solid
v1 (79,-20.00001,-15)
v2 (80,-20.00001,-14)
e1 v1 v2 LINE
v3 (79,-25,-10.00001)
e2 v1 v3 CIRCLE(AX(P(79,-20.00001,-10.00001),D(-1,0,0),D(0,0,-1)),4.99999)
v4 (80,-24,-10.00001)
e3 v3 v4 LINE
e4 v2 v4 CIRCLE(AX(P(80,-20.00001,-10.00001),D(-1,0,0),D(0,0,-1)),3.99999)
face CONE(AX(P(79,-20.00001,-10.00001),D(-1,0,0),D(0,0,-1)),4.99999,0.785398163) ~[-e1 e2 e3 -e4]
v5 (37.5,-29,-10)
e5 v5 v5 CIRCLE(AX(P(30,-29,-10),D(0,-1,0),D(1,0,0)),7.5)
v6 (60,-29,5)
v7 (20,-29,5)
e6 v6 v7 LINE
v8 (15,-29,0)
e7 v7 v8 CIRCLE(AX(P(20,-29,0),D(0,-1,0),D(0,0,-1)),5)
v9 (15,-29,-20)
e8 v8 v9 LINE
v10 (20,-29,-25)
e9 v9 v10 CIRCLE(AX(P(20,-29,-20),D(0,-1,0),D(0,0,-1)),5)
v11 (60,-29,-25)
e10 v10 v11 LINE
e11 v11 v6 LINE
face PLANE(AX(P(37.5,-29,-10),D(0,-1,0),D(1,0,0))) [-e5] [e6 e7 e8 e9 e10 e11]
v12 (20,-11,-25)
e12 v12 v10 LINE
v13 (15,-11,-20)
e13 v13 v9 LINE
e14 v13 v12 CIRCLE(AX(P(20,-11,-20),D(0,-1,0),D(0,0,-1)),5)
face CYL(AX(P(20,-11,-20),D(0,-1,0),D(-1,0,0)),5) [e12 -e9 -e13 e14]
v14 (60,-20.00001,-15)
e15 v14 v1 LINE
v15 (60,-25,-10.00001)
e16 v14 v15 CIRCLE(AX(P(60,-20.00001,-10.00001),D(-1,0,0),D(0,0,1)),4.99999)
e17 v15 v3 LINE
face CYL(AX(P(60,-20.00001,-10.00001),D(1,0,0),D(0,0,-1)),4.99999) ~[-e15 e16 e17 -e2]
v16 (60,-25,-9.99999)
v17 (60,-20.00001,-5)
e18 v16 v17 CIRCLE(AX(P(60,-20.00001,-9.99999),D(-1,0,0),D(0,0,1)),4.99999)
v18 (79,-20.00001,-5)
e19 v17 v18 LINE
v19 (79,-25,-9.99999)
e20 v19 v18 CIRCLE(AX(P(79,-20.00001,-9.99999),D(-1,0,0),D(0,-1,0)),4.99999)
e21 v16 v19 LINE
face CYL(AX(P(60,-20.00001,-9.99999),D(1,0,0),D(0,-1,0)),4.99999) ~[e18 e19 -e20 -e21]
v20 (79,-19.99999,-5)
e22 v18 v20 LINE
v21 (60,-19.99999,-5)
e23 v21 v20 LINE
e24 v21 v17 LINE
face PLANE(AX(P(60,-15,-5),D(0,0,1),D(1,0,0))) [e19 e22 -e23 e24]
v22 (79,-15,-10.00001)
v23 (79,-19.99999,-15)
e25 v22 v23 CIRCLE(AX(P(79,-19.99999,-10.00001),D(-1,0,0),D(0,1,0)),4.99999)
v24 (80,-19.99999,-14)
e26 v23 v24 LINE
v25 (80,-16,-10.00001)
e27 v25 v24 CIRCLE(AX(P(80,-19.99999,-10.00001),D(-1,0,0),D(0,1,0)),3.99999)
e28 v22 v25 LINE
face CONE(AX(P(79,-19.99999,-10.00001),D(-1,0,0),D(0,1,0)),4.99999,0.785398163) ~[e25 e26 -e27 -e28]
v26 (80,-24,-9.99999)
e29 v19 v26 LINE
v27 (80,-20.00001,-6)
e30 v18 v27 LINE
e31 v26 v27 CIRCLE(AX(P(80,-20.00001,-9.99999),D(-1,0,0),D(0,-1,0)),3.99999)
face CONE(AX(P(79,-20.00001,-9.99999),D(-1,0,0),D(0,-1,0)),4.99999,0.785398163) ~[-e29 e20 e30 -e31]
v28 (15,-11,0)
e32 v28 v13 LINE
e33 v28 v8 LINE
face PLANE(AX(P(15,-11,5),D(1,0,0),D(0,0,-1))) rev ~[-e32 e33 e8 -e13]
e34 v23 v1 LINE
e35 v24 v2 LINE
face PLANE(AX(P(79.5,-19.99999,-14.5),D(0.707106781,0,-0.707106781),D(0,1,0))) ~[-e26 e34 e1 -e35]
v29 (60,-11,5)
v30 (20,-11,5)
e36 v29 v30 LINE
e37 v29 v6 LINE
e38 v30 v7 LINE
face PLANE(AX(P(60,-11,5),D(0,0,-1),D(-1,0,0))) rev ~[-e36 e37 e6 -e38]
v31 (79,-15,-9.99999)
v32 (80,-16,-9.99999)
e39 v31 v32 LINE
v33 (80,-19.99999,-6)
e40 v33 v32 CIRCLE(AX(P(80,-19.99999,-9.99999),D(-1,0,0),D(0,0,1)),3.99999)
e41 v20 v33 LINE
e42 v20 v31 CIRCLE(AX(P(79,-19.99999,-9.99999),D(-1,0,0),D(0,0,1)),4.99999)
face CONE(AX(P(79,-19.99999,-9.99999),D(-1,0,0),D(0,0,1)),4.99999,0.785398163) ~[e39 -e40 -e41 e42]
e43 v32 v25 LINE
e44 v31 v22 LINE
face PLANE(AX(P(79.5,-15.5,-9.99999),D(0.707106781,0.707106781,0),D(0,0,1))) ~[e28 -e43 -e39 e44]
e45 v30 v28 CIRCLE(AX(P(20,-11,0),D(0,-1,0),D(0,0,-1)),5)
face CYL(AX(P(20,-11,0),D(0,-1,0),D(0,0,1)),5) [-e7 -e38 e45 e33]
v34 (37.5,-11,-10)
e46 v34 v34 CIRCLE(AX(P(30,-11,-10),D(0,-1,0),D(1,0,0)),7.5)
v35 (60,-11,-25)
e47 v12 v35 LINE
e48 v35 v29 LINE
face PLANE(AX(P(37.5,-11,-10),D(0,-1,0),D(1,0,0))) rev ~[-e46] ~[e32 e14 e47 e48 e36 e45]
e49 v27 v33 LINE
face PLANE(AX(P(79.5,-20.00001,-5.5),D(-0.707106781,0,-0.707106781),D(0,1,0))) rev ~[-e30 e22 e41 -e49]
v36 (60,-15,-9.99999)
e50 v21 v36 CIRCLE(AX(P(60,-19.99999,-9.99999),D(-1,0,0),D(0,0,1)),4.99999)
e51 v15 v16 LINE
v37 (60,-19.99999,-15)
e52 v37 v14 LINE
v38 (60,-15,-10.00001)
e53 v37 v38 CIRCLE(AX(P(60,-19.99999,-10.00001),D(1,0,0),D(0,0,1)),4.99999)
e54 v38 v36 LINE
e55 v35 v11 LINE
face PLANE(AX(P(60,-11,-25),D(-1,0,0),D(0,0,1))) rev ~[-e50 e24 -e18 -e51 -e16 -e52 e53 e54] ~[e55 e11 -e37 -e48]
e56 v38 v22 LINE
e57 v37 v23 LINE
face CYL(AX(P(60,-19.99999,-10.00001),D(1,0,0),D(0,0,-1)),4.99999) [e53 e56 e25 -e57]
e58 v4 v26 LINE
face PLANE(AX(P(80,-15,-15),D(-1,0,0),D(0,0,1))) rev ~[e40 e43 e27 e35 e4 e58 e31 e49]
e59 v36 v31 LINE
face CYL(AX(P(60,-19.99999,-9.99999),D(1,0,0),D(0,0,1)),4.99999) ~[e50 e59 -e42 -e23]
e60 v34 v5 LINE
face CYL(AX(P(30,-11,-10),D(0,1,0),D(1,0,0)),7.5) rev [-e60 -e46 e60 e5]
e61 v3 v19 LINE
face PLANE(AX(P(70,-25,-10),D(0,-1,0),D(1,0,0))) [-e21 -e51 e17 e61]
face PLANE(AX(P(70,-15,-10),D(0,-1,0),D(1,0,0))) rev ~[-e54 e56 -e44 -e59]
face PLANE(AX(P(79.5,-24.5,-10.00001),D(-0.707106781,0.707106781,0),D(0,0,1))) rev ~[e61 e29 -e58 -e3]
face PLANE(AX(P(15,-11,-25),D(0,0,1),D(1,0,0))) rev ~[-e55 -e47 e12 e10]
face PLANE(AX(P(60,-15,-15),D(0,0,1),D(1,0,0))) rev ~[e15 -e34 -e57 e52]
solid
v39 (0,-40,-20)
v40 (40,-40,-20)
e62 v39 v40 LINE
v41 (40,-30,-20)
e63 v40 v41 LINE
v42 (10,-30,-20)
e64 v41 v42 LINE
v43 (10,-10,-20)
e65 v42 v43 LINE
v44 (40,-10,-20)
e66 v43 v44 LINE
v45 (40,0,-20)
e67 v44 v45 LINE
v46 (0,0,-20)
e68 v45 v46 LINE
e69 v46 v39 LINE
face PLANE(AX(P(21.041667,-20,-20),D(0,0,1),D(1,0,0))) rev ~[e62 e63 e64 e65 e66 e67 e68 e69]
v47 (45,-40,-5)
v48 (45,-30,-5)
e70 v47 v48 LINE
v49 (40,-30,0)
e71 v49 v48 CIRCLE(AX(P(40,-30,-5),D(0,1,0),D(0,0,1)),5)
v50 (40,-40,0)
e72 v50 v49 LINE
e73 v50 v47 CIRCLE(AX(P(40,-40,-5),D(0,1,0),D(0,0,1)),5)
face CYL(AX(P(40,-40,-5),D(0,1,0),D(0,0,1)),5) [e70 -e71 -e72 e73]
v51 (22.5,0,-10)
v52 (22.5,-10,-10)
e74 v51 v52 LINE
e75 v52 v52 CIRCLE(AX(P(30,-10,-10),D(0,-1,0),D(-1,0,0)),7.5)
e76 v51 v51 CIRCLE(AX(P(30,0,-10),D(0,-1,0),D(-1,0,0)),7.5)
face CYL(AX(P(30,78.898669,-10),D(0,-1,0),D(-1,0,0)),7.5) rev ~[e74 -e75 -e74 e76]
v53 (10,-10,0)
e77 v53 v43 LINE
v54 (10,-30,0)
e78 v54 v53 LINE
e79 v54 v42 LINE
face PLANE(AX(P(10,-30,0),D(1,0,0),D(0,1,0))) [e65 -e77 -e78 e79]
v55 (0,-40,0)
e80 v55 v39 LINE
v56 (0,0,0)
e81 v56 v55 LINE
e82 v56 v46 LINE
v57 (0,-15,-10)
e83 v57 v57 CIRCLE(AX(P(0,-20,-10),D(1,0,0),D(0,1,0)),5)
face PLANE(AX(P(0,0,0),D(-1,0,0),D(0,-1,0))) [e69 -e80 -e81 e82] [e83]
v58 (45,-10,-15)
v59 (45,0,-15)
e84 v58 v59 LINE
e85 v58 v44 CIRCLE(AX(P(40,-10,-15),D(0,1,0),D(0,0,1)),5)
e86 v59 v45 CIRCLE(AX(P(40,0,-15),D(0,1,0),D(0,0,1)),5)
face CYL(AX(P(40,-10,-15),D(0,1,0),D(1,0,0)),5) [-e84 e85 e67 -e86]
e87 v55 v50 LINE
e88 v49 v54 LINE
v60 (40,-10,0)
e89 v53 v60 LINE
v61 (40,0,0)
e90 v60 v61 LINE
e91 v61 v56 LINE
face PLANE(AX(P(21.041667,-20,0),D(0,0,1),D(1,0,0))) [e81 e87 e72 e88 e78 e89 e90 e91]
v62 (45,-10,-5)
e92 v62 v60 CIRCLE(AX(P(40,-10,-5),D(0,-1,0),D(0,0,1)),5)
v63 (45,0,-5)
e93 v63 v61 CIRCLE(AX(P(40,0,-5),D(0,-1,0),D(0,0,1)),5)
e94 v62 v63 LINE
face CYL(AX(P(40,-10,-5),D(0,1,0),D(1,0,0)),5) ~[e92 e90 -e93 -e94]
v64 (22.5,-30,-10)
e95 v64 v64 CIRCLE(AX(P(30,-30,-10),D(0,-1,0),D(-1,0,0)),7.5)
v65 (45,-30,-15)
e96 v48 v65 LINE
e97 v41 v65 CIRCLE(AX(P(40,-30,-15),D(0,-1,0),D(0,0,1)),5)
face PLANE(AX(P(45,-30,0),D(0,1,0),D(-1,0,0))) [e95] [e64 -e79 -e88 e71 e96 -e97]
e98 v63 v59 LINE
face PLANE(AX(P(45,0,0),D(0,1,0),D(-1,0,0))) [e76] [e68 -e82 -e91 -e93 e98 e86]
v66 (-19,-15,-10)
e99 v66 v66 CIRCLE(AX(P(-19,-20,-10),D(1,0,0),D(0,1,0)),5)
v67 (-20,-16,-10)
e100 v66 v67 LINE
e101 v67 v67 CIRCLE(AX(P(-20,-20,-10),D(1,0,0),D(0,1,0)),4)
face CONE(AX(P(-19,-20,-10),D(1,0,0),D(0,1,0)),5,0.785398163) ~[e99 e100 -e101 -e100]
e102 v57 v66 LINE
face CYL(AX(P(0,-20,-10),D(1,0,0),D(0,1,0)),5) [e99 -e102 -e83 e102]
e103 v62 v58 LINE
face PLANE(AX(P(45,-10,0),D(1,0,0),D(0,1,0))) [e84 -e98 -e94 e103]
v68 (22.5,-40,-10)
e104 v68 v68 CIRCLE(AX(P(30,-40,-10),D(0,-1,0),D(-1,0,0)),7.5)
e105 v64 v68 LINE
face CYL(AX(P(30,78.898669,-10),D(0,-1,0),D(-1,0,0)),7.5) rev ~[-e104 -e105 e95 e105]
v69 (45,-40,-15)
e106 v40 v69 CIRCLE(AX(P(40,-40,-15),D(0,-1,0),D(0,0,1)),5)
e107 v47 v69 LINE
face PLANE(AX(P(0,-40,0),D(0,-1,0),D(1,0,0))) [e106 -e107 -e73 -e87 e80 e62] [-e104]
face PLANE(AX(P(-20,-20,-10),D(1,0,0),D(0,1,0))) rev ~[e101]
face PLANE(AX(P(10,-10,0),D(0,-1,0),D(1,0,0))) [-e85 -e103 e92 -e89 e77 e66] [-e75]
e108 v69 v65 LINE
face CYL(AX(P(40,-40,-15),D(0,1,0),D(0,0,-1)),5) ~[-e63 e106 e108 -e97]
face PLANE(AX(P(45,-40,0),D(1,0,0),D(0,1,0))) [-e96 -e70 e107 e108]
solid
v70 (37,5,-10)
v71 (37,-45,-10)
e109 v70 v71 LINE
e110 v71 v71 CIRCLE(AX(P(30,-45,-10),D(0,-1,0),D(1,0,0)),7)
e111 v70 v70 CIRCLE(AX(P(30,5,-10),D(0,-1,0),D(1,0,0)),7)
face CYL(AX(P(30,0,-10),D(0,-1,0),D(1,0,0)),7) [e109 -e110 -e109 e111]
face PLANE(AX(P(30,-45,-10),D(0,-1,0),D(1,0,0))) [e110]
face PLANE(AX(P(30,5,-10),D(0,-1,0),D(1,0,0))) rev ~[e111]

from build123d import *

# Parameters (mm, degrees)
F0_R          = 5
F1_DEPTH      = 20
F3_DEPTH      = 20
F4_R          = 5
F6_D          = 15
F7_SIZE       = 1
F5_R          = 7
F8_DEPTH      = 45
F8_DEPTH_BACK = 5
F9_START      = 11
F5_R_2        = 7.5
F9_DEPTH      = 18
F10_R         = 5
F11_START     = 15
F5_W          = 20
F5_H          = 10
F11_DEPTH     = 10
F12_R         = 4.99999
F13_SIZE      = 1


# Not quite as in the source:
# - a fillet or chamfer is up to 0.001 mm smaller than in the source, because OpenCascade refuses the exact size
# - a feature names something its author has since deleted; it is built from what else it names


with BuildPart() as f1:
    # F0 (on Right) → F1 (new body)
    with BuildSketch(Plane.YZ):
        with Locations((-20, -10)):
            Circle(F0_R)
    extrude(amount=-F1_DEPTH)

    # F2 (on Top) → F3 (join)
    with BuildSketch(Plane.XY):
        Polygon((45, 0), (0, 0), (0, -40), (45, -40), (45, -30), (15, -30), (10, -30), (10, -10), (15, -10), (45, -10), align=None)
    extrude(amount=-F3_DEPTH)

    # F4
    f4_edges = [f1.edges().sort_by_distance(p)[0] for p in [
        (45, -35, 0),
        (45, -5, 0),
        (45, -35, -20),
        (45, -5, -20),
    ]]
    fillet(f4_edges, radius=F4_R)

    # F6 (through all)
    with Locations(Plane(origin=(0, 0, 0), x_dir=(1, 0, 0), z_dir=(0, 1, 0))):
        with Locations((30, 10)):
            Hole(F6_D / 2)

    # F7
    f7_edges = [f1.edges().sort_by_distance(p)[0] for p in [
        (-20, -25, -10),
    ]]
    chamfer(f7_edges, length=F7_SIZE)


with BuildPart() as f8:
    # F5 (on Front) → F8 (new body, two sides)
    with BuildSketch(Plane.XZ) as f8_sk:
        with Locations((30, -10)):
            Circle(F5_R)
    extrude(amount=F8_DEPTH)
    extrude(f8_sk.sketch, amount=-F8_DEPTH_BACK)


with BuildPart() as f9:
    # F5 (on Front) → F9 (new body)
    with BuildSketch(Plane.XZ.offset(F9_START)):
        Polygon((60, 5), (15, 5), (15, -25), (60, -25), (60, -15), (60, -5), align=None)
        with Locations((30, -10)):
            Circle(F5_R_2, mode=Mode.SUBTRACT)
    extrude(amount=F9_DEPTH)

    # F10
    f10_edges = [f9.edges().sort_by_distance(p)[0] for p in [
        (15, -20, 5),
        (15, -20, -25),
    ]]
    fillet(f10_edges, radius=F10_R)

    # F5 (on Front) → F11 (join)
    with BuildSketch(Plane.XZ.offset(F11_START)):
        with Locations((70, -10)):
            Rectangle(F5_W, F5_H)
    extrude(amount=F11_DEPTH)

    # F12 (radius 5 in the source; OpenCascade refuses exactly that, so slightly less here)
    f12_edges = [f9.edges().sort_by_distance(p)[0] for p in [
        (70, -25, -5),
        (70, -15, -5),
        (70, -15, -15),
        (70, -25, -15),
    ]]
    fillet(f12_edges, radius=F12_R)

    # F13
    f13_edges = [f9.edges().sort_by_distance(p)[0] for p in [
        (80, -20, -15),
        (80, -16.464463, -13.535537),
        (80, -23.535537, -13.535537),
        (80, -15, -10),
        (80, -25, -10),
        (80, -16.464463, -6.464463),
        (80, -23.535537, -6.464463),
        (80, -20, -5),
    ]]
    chamfer(f13_edges, length=F13_SIZE)


solid = Compound([f1.part, f8.part, f9.part])
